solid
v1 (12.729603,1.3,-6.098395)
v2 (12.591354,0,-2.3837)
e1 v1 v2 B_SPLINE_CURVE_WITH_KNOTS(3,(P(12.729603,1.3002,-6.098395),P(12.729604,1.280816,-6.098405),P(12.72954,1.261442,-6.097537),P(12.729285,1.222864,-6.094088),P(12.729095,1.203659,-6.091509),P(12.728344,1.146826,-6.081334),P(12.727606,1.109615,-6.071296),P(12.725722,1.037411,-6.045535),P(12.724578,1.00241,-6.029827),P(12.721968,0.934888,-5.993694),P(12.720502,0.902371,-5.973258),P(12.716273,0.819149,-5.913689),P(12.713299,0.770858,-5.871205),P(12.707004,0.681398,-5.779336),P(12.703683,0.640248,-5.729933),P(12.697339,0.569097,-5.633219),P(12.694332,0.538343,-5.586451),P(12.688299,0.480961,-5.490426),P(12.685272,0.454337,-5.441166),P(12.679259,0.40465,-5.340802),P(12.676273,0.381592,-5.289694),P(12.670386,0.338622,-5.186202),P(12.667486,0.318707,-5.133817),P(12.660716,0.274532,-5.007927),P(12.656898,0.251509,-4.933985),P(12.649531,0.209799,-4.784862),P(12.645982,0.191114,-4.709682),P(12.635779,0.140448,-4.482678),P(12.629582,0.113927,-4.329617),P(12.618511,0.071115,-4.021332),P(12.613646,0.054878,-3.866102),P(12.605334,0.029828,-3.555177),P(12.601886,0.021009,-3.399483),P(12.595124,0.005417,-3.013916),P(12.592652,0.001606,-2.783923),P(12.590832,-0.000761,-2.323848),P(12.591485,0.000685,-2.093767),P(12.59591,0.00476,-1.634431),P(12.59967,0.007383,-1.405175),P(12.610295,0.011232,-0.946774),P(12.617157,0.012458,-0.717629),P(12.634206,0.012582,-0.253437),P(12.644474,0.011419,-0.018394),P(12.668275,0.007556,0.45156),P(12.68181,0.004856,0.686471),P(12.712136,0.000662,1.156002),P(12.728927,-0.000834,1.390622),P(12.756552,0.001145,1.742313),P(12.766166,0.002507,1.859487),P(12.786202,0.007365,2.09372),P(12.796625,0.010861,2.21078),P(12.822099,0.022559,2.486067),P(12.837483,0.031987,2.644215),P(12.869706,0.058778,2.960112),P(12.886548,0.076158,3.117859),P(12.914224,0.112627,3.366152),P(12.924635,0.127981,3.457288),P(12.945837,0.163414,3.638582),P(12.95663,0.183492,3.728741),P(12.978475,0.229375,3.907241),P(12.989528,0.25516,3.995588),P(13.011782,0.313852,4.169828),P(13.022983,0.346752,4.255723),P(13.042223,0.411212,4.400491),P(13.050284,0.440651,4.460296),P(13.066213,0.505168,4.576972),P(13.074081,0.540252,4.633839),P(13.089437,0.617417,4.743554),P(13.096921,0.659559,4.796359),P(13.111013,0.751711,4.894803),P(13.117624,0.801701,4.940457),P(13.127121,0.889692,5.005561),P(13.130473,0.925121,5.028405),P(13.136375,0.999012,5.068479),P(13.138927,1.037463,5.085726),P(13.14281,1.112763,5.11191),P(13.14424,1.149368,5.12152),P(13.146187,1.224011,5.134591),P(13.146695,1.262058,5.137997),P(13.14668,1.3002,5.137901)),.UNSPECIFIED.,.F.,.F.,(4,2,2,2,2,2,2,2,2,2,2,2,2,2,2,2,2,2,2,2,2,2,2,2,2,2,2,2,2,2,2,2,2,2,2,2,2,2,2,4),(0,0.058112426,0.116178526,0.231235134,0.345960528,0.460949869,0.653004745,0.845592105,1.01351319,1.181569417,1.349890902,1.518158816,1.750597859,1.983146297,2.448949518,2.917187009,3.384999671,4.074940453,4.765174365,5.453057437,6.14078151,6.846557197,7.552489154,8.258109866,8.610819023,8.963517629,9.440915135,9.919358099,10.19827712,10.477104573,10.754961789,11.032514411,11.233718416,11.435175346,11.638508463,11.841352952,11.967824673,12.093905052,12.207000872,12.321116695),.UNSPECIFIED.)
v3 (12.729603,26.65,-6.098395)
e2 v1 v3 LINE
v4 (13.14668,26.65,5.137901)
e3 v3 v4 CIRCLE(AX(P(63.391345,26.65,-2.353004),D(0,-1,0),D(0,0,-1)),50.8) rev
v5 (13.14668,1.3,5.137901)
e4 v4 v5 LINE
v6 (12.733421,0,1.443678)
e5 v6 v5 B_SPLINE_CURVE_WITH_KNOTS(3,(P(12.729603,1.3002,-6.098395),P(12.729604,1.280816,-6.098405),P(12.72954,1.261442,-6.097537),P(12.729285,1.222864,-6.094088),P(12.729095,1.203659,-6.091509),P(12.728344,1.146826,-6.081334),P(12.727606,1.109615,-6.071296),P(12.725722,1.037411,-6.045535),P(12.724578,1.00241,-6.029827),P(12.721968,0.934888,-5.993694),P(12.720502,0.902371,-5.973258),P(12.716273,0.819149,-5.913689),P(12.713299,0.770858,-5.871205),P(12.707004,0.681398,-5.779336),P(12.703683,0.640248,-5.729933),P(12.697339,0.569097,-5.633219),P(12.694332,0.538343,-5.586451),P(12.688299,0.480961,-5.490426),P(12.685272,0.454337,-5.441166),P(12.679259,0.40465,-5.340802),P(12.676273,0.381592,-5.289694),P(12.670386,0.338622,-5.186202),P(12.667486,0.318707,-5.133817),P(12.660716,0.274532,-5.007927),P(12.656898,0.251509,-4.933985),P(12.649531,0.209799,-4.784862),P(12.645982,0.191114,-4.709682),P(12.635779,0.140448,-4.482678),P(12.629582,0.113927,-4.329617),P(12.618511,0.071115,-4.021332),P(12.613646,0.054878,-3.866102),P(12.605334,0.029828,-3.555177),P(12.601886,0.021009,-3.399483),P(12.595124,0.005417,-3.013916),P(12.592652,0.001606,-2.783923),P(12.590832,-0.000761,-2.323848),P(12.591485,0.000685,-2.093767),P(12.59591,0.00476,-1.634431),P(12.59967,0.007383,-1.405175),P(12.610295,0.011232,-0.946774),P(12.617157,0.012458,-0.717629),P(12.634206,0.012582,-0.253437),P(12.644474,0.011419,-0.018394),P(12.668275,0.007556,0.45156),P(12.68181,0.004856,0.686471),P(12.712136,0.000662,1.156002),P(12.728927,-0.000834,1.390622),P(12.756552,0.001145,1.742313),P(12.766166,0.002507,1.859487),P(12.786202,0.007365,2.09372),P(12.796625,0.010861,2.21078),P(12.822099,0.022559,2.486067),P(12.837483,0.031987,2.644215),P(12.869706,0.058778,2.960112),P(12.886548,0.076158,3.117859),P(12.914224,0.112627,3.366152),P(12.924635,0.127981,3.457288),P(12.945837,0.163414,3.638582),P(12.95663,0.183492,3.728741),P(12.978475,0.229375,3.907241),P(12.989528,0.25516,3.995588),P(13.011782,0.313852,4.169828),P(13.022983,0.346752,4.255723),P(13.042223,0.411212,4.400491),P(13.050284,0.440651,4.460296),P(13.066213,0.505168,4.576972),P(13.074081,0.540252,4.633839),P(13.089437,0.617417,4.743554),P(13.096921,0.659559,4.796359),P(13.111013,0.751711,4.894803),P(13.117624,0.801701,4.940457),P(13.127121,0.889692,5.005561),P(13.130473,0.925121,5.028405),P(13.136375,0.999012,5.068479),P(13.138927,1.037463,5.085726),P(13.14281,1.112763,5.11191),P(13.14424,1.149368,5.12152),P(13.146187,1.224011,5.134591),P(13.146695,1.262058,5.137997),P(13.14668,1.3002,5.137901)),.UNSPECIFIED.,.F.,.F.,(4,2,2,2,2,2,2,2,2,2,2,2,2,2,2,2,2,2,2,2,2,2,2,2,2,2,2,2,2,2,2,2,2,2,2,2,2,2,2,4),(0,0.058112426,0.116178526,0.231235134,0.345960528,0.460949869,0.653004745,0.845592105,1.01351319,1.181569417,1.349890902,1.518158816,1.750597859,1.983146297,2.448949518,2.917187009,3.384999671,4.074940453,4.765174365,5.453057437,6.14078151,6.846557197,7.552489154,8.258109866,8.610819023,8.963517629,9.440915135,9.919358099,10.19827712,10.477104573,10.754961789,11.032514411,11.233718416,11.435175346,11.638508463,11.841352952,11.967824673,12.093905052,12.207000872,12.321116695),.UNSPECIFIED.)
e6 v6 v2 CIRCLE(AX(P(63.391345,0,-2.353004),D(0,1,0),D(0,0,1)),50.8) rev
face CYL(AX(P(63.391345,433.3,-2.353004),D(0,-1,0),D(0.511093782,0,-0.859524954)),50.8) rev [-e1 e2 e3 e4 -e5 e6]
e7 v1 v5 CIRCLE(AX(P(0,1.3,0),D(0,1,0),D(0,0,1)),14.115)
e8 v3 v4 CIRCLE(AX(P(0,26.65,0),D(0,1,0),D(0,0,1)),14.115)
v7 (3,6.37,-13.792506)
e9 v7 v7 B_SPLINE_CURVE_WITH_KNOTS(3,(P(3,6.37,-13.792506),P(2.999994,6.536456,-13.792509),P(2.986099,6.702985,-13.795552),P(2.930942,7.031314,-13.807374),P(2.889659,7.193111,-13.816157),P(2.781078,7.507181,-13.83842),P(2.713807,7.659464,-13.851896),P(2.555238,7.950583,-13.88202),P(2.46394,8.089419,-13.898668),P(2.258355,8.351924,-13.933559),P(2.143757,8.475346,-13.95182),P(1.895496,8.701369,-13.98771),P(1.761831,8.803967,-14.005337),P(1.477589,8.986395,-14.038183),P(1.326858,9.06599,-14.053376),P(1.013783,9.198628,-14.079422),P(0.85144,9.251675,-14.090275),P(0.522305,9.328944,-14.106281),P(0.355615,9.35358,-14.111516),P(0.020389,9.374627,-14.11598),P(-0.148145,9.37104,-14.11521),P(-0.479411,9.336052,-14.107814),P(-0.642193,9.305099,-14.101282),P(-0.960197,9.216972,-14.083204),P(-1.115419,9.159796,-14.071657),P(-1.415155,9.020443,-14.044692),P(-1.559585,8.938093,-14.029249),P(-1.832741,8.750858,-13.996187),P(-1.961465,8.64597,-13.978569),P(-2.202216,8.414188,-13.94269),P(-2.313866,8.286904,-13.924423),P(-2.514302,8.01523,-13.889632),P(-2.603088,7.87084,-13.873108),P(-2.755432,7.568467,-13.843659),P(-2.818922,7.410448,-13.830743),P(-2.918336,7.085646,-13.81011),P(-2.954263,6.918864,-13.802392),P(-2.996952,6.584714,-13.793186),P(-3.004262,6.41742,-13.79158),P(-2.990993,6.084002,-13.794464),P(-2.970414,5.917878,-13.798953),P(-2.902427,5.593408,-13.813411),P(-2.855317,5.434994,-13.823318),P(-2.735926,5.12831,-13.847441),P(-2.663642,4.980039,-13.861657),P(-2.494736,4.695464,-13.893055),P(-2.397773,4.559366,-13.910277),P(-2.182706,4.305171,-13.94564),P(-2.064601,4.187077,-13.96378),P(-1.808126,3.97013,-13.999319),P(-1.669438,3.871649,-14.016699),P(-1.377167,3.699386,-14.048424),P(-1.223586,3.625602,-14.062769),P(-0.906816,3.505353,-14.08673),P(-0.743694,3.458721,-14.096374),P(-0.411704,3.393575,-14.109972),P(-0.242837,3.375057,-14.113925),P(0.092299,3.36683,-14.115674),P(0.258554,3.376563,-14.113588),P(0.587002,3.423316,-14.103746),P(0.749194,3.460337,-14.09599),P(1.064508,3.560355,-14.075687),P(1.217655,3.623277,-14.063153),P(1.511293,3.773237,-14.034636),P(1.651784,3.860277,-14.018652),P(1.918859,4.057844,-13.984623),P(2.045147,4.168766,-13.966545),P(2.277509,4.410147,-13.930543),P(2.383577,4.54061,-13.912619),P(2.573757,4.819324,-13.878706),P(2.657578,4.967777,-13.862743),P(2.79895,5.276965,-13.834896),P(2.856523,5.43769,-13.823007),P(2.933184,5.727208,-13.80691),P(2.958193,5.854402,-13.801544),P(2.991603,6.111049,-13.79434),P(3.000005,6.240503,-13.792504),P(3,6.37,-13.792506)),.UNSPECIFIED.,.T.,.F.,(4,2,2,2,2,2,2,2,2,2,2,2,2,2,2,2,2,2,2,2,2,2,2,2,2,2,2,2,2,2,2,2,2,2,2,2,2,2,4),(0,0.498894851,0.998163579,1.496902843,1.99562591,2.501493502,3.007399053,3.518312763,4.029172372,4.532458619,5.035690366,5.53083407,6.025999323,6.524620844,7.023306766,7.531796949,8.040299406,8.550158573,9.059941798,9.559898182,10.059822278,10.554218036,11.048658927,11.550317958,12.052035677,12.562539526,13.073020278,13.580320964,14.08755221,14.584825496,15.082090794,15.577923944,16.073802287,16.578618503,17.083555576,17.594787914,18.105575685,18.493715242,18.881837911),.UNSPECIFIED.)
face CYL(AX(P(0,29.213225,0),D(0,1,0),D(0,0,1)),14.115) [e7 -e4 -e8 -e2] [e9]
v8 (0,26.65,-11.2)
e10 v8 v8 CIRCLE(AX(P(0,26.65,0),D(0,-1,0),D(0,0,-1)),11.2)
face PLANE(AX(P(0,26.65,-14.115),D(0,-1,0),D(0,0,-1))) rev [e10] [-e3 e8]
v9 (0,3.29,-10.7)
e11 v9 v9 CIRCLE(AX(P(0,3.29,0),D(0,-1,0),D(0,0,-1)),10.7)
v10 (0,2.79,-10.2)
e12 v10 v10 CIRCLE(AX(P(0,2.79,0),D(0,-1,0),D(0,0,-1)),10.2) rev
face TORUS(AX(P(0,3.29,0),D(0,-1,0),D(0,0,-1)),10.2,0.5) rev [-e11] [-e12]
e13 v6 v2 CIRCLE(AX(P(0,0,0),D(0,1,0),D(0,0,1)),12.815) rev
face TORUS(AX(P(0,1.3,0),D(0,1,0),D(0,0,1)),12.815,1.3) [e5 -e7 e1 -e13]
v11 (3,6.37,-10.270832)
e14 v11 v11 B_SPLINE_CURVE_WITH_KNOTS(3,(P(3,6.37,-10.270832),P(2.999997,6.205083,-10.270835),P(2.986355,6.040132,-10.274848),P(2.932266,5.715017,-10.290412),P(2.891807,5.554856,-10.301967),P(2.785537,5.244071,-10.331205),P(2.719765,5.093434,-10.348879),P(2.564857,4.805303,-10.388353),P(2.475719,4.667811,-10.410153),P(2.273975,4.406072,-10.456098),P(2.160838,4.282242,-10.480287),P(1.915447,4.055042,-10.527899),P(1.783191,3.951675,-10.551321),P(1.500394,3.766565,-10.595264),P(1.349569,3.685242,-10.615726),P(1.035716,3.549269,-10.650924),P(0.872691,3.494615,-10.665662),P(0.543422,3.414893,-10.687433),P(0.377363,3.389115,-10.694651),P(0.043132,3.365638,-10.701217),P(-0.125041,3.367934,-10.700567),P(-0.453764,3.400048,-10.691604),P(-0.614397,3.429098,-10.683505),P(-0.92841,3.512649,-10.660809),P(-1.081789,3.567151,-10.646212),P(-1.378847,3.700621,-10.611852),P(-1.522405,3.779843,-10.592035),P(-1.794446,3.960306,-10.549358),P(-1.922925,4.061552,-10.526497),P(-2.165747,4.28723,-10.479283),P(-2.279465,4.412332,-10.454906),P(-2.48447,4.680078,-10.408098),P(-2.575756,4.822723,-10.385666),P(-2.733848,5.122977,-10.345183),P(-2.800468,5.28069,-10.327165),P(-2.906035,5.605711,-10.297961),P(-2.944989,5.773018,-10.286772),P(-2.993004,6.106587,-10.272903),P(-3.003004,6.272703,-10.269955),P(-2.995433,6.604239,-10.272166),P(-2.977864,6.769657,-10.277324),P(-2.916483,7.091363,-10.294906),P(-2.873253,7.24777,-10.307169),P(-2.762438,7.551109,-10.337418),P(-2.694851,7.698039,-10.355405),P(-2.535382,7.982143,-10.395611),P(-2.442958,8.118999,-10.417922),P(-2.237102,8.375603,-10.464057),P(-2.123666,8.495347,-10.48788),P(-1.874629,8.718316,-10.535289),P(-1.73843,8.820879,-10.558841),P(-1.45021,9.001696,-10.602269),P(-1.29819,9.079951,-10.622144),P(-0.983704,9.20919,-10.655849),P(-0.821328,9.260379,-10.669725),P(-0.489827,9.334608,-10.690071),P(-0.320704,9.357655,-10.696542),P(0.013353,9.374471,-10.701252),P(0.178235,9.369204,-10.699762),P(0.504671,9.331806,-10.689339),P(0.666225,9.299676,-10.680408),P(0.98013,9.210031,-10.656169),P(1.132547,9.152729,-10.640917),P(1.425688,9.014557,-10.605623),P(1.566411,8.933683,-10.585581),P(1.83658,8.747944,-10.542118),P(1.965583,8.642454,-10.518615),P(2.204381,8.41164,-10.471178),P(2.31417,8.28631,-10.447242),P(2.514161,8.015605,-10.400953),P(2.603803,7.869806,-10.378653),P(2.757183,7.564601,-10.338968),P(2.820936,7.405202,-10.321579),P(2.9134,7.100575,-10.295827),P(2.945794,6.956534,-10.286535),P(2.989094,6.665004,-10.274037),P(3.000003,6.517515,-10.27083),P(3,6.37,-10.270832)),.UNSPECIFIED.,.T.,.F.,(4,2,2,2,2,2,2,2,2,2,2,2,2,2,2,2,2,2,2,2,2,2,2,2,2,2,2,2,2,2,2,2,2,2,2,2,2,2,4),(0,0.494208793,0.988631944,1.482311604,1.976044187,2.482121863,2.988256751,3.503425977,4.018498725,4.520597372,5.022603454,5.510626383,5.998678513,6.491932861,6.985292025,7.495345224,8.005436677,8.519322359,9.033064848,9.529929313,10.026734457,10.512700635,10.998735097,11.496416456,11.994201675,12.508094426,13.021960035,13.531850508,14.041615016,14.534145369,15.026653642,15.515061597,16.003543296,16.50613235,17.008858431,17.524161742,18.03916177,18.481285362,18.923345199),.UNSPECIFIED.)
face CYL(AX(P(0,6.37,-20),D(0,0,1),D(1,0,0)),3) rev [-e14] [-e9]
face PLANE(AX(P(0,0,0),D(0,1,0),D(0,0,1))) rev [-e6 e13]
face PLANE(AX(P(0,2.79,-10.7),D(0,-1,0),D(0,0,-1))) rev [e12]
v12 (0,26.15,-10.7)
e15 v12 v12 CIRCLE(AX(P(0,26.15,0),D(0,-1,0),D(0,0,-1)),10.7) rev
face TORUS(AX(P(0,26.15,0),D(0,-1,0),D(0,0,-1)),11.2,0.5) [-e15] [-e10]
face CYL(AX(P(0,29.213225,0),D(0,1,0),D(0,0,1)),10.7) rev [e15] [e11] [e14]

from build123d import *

# Parameters (mm, degrees)
FILLET1_R          = 1.3
SKETCH3_R          = 3
CUT_EXTRUDE1_DEPTH = 20
FILLET3_R          = 0.5
FILLET4_R          = 0.5
CAVITY1_OUTLINE_W  = 50.8
CAVITY1_OUTLINE_H  = 26.650011625


# Read off the part's stored shape, not the designer's step: Cavity1
with BuildPart() as part:
    # Sketch2 → Revolve1 (revolve)
    with BuildSketch(Plane(origin=(0, 0, 0), x_dir=(0, 0, -1), z_dir=(1, 0, 0)), mode=Mode.PRIVATE) as revolve1_sk:
        Polygon((0, 0), (14.115, 0), (14.115, 26.65), (10.7, 26.65), (10.7, 2.79), (0, 2.79), align=None)
    revolve(revolve1_sk.sketch.rotate(Axis((0, 29.213224894, 0), (0, -1, 0)), 180), axis=Axis((0, 29.213224894, 0), (0, -1, 0)))

    # Fillet1
    fillet1_edges = [part.edges().sort_by_distance(p)[0] for p in [
        (0, 0, -14.115),
    ]]
    fillet(fillet1_edges, radius=FILLET1_R)

    # Sketch3 → Cut-Extrude1 (cut)
    with BuildSketch(Plane.XY):
        with Locations((0, 6.37)):
            Circle(SKETCH3_R)
    extrude(amount=-CUT_EXTRUDE1_DEPTH, mode=Mode.SUBTRACT)

    # Fillet3
    fillet3_edges = [part.edges().sort_by_distance(p)[0] for p in [
        (0, 2.79, -10.7),
    ]]
    fillet(fillet3_edges, radius=FILLET3_R)

    # Fillet4
    fillet4_edges = [part.edges().sort_by_distance(p)[0] for p in [
        (0, 26.65, -10.7),
    ]]
    fillet(fillet4_edges, radius=FILLET4_R)

    # Cavity1 outline → Cavity1 (revolve, cut)
    with BuildSketch(Plane(origin=(63.391344809, 0, -2.353004111), x_dir=(1, 0, 0), z_dir=(0, 0, 1))):
        with Locations((25.4, 13.324994188)):
            Rectangle(CAVITY1_OUTLINE_W, CAVITY1_OUTLINE_H)
    revolve(axis=Axis((63.391344809, 0, -2.353004111), (0, 1, 0)), mode=Mode.SUBTRACT)


solid = part.part
